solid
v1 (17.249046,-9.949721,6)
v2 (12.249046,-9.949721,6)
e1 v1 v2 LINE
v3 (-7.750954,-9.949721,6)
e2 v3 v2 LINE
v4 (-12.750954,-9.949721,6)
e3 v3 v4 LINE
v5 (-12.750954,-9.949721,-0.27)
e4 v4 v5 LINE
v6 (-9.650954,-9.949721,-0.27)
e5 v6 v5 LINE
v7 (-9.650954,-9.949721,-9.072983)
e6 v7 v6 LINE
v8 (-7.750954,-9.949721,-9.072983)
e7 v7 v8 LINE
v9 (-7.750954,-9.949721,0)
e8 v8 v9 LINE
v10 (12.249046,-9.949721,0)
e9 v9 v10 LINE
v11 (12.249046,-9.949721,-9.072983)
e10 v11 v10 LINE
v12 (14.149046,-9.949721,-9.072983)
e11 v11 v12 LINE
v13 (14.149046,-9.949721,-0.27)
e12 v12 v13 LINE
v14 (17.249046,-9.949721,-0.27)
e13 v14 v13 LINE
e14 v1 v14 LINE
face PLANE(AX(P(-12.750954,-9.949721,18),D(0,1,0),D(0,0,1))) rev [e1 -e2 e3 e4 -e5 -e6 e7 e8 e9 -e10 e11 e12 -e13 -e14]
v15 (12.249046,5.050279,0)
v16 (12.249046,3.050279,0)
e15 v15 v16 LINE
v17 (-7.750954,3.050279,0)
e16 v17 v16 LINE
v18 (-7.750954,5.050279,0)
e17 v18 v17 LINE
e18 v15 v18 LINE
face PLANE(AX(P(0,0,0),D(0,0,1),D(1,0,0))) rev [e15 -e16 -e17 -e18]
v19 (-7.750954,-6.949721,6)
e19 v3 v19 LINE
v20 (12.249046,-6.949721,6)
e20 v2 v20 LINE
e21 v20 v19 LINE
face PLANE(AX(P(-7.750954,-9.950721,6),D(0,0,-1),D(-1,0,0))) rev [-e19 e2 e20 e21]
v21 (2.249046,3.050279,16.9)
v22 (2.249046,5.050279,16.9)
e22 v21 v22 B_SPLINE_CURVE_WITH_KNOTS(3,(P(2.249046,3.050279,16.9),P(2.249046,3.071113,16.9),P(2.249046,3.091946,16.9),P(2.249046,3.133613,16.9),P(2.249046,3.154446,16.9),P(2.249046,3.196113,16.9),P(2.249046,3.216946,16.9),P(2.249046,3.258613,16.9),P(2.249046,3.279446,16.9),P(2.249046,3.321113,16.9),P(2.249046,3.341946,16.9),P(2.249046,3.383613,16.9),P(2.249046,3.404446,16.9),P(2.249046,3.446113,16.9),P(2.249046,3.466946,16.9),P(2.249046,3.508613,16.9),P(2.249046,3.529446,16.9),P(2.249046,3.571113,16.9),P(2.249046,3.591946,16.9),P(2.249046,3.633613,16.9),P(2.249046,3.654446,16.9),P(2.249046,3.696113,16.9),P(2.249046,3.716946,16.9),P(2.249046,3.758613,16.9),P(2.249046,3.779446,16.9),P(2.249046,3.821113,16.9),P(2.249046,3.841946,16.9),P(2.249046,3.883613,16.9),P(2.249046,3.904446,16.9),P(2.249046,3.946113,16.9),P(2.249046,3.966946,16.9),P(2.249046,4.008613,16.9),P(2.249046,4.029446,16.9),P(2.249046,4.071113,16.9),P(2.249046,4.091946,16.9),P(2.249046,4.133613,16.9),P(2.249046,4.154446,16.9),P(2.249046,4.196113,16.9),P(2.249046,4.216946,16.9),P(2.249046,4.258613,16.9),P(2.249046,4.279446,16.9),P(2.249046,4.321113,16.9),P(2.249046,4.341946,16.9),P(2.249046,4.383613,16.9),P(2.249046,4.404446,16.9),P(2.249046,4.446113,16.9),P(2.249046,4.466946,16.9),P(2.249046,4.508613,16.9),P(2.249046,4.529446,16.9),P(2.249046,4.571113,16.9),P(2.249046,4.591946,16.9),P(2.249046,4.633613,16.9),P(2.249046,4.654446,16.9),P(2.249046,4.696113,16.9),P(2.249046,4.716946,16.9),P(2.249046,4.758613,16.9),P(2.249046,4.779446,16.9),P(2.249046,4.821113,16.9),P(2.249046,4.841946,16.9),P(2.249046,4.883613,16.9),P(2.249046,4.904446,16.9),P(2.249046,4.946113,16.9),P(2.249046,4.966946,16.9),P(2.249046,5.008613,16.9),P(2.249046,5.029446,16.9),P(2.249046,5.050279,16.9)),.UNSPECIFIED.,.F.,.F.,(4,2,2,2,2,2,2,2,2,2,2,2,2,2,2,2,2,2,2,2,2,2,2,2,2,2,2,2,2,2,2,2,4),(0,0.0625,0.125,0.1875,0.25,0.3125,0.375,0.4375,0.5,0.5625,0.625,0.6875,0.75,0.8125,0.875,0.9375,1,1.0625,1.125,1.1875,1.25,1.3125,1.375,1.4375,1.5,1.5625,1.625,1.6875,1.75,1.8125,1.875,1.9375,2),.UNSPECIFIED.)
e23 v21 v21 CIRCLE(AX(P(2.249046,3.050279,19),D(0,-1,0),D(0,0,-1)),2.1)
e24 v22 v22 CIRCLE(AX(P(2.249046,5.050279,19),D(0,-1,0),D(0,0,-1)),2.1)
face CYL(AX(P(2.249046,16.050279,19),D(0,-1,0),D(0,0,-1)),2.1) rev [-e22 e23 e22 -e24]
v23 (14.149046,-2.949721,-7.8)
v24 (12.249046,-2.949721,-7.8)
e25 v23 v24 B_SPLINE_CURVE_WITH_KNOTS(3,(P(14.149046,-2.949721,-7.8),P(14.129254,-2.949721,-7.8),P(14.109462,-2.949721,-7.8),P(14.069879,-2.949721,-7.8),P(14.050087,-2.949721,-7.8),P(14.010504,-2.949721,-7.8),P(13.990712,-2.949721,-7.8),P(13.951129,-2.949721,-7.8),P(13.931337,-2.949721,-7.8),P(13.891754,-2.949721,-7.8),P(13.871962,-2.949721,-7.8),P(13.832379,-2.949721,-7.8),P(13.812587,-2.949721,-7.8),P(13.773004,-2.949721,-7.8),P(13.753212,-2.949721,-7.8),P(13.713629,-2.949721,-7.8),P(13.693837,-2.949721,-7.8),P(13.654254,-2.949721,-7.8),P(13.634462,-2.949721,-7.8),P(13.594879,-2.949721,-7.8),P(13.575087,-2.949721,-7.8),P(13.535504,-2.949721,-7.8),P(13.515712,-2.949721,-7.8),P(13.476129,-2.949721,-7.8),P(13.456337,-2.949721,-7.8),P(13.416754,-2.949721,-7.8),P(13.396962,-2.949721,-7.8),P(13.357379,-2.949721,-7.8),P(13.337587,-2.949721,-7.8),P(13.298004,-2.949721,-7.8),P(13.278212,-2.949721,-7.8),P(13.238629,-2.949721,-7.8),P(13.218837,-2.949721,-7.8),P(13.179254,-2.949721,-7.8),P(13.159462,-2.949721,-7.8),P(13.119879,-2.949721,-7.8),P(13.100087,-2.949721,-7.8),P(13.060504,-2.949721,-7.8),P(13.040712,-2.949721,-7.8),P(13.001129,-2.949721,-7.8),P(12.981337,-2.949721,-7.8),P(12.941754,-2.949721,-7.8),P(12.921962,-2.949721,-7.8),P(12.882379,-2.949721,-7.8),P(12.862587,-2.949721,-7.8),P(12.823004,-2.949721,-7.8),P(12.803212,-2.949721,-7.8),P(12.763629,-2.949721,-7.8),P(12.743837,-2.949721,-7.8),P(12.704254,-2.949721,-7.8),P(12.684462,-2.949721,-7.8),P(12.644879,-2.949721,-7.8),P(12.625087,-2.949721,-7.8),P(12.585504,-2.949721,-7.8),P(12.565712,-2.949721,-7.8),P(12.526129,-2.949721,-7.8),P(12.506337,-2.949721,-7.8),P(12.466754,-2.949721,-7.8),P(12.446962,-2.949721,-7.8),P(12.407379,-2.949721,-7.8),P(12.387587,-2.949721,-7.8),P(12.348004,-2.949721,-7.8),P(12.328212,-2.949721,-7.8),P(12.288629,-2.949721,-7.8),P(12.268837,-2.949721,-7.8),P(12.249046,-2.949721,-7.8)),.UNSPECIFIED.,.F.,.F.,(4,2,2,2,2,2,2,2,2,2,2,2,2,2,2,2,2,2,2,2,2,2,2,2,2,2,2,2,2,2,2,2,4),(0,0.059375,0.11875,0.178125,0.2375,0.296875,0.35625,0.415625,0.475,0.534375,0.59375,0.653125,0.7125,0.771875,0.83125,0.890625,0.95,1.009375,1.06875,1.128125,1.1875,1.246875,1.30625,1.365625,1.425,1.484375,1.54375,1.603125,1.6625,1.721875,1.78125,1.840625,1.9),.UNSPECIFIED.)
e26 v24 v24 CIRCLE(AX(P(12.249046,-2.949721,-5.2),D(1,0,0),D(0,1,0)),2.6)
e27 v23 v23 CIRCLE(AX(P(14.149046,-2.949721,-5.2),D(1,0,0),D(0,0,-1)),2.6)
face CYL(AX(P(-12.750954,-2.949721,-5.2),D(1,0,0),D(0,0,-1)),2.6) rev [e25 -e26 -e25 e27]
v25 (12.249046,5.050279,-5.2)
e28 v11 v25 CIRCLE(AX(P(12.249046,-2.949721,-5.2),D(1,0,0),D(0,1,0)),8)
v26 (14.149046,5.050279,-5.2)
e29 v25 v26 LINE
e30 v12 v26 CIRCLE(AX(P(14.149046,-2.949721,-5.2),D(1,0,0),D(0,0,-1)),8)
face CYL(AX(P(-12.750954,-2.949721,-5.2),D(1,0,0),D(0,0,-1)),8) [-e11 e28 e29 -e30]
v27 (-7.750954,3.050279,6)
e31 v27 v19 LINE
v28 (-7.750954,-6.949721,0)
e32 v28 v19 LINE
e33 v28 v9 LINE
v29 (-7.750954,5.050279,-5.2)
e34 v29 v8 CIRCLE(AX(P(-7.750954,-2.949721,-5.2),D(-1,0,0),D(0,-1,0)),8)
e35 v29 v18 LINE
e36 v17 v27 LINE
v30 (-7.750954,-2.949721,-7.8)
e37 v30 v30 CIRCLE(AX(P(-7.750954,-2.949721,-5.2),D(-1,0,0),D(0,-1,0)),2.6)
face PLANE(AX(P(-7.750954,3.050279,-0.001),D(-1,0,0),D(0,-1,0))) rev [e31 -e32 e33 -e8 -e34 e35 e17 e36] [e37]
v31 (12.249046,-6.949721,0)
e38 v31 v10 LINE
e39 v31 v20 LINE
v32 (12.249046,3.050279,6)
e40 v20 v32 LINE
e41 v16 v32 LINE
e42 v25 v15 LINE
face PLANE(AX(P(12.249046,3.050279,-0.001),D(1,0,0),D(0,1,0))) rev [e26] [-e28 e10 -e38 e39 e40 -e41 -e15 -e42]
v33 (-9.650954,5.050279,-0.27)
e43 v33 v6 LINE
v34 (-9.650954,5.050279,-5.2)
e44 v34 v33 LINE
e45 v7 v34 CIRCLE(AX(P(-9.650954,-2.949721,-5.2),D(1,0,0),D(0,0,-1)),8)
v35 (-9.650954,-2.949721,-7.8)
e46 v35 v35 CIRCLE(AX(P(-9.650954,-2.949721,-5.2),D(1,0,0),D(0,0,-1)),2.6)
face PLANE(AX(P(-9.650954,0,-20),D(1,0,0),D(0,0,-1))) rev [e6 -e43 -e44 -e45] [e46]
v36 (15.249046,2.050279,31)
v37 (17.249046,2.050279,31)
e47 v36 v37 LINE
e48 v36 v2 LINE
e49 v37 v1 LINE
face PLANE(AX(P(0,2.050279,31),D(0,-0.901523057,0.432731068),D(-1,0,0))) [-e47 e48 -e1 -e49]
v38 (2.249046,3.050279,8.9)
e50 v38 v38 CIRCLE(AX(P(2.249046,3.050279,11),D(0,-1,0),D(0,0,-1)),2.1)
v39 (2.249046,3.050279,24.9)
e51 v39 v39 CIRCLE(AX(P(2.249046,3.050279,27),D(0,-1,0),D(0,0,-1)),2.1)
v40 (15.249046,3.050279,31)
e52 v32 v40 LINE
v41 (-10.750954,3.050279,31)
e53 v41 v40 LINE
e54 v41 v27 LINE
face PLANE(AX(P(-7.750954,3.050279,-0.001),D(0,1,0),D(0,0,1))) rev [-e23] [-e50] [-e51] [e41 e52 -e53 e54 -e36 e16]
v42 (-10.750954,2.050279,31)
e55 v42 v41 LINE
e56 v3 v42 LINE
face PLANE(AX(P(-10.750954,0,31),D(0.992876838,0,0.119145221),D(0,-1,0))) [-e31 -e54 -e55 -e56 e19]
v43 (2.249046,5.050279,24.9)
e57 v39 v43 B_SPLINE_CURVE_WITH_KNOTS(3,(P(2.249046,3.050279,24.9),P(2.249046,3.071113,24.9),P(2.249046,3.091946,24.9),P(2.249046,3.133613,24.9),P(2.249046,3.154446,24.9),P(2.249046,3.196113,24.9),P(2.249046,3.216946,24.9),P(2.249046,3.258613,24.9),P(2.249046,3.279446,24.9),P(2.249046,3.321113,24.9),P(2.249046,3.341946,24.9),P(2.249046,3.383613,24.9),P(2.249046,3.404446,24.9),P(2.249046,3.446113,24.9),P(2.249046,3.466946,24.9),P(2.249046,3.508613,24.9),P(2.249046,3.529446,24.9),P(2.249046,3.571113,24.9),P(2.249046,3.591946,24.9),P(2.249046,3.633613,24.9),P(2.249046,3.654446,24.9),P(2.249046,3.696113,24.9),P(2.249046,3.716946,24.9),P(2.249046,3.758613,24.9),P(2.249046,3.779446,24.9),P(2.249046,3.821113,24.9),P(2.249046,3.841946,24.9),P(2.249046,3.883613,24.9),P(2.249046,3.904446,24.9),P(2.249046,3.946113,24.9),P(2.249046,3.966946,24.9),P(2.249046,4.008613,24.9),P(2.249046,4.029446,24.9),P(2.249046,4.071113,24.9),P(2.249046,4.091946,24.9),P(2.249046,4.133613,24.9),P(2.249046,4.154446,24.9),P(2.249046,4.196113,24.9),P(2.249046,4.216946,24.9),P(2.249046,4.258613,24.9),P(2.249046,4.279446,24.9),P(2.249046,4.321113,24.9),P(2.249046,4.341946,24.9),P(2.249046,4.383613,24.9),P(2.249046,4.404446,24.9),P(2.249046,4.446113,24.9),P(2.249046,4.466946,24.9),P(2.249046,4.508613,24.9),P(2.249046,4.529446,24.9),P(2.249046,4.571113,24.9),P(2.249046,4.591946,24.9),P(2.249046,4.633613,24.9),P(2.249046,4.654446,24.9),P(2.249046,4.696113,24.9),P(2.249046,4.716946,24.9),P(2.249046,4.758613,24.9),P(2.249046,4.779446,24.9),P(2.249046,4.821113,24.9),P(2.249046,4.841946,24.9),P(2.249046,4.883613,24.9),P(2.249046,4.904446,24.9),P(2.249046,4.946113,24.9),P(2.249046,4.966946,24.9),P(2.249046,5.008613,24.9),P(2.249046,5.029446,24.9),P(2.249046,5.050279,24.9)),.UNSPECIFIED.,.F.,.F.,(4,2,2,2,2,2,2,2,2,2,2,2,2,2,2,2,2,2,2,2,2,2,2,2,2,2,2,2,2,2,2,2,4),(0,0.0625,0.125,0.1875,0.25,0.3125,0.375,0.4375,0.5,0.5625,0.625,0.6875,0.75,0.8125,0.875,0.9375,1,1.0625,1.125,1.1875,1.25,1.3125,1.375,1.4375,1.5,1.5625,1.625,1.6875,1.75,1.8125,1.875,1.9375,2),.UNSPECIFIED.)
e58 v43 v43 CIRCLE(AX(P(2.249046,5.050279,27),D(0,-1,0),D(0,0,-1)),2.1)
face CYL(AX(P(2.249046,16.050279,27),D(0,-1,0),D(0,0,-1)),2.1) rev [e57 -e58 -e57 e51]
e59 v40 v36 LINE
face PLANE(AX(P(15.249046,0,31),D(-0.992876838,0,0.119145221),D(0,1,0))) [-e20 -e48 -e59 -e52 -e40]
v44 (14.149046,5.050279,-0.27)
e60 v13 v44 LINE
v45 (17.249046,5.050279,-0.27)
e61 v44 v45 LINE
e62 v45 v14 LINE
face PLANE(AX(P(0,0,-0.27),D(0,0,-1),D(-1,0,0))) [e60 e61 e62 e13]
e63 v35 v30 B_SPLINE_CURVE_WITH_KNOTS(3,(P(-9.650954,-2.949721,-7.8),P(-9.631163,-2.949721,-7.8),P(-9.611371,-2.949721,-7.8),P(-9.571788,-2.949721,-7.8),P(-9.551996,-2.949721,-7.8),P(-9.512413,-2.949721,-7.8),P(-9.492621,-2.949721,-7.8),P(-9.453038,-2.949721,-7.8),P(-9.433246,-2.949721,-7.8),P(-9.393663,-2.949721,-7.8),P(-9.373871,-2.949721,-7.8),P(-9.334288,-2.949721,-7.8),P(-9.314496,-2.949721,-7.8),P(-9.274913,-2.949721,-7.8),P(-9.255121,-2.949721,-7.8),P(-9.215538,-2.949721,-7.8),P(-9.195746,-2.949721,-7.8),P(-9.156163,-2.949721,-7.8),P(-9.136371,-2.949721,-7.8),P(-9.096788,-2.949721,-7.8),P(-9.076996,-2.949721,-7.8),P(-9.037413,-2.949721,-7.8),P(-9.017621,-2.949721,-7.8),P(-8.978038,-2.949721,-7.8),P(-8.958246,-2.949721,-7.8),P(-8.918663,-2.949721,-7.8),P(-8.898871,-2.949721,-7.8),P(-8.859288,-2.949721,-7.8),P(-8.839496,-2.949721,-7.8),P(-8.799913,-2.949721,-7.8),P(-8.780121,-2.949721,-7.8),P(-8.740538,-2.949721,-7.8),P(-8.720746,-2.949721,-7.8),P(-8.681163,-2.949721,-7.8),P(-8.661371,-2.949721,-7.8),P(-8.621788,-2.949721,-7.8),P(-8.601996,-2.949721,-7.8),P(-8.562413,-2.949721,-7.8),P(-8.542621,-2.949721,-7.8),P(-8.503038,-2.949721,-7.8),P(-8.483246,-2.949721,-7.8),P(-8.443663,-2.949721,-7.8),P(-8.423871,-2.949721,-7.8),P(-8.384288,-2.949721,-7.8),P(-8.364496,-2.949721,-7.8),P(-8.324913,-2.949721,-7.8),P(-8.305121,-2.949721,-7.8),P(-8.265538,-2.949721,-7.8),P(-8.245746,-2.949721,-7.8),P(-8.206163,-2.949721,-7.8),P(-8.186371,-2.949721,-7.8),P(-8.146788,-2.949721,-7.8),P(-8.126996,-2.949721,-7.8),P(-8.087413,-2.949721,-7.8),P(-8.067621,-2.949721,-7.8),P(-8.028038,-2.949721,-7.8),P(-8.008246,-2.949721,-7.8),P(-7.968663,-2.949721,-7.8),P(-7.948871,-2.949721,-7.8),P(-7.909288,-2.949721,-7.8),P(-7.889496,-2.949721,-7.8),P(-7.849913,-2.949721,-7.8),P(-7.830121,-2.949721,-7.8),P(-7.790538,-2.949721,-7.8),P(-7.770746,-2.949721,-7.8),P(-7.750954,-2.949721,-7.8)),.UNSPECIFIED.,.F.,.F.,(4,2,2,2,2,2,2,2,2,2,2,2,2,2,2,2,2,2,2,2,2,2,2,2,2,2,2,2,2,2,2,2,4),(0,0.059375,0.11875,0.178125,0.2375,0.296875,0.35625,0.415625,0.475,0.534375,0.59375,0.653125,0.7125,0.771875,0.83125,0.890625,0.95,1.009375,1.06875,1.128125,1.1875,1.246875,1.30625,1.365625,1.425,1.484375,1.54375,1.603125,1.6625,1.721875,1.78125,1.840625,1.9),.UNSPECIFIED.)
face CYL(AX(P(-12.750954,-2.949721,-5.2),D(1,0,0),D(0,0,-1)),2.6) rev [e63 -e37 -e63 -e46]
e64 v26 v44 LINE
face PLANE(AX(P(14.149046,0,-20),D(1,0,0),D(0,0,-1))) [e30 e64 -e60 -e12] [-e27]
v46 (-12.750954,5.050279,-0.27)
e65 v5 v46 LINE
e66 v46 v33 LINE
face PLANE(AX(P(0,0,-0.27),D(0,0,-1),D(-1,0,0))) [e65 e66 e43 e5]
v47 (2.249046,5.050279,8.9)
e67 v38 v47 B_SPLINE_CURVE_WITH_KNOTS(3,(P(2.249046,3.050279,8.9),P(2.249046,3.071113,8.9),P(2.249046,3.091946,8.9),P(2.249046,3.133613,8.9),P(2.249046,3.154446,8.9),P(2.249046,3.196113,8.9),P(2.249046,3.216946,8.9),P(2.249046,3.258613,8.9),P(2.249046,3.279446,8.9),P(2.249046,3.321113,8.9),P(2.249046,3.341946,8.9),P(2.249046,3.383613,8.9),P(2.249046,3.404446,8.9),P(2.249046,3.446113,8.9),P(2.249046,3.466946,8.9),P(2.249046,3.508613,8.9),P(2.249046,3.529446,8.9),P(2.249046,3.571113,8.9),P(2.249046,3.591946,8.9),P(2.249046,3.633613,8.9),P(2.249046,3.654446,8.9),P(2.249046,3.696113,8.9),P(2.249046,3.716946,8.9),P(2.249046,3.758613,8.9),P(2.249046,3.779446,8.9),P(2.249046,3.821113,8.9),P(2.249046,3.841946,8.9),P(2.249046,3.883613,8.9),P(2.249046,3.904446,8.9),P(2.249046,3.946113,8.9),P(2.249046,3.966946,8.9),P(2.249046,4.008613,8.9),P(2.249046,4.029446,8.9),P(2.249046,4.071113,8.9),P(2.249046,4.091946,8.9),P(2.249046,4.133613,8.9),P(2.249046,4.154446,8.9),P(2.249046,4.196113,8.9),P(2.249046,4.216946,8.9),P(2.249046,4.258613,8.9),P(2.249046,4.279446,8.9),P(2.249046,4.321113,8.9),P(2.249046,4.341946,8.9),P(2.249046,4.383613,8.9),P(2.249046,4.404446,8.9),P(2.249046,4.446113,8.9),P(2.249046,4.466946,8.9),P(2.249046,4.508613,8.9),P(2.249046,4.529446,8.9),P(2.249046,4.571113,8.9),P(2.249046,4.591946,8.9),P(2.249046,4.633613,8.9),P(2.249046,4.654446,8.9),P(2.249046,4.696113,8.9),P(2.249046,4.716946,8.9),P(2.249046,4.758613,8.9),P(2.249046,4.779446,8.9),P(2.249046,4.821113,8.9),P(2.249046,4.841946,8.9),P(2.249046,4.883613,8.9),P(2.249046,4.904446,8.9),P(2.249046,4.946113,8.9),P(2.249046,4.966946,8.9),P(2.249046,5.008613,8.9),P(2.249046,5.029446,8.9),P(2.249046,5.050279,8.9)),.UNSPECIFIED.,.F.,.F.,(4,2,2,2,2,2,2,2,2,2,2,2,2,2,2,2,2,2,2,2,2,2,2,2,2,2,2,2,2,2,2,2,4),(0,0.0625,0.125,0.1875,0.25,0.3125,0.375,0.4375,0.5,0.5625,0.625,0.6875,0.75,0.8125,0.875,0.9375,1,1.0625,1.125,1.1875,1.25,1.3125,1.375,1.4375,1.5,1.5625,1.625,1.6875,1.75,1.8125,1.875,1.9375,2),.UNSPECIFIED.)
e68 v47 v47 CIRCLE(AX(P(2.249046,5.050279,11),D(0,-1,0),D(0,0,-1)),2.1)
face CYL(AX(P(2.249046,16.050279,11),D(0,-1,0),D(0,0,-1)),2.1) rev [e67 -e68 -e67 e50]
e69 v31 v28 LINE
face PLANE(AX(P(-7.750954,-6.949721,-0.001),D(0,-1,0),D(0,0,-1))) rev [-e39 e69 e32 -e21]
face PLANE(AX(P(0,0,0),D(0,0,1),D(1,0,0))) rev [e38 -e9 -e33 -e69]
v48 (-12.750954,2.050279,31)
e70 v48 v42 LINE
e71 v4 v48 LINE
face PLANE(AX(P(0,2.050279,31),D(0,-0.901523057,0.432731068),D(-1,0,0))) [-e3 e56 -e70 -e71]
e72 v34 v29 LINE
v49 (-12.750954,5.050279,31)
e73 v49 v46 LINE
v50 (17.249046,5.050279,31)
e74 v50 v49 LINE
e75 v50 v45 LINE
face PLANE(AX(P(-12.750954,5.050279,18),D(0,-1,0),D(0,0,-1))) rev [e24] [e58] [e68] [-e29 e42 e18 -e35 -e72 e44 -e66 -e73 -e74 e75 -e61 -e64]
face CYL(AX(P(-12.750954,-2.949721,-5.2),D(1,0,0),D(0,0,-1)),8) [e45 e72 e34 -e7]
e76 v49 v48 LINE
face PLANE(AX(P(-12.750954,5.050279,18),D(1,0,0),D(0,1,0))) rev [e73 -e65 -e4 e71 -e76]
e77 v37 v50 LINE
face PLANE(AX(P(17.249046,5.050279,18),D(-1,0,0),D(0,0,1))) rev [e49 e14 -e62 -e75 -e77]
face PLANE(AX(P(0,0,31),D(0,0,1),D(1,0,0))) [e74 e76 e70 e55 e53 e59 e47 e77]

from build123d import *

# Parameters (mm, degrees)
SKETCH_1_W               = 30
SKETCH_1_H               = 15
EXTRUDE_1_DEPTH          = 18
CUT_EXTRUDE_1_REACH      = 28.843
SKETCH_2_W               = 20
SKETCH_2_H               = 10
CUT_EXTRUDE_2_REACH      = 29.668
SKETCH_3_W               = 20
SKETCH_3_H               = 12
EXTRUDE_4_DEPTH          = 20
SKETCH_10_R              = 2.6
CUT_EXTRUDE_8_DEPTH      = 35.965796737
CUT_EXTRUDE_9_DEPTH      = 35.965796737
CUT_EXTRUDE_9_DEPTH_BACK = 35.965796737
SKETCH_12_W              = 1.696031958
SKETCH_12_H              = 15
SKETCH_17_W              = 3.1
SKETCH_17_H              = 15
EXTRUDE_8_DEPTH          = 0.27
EXTRUDE_9_DEPTH          = 13
CHAMFER_1_SIZE           = 25
CHAMFER_1_SIZE2          = 12
SKETCH_19_R              = 2.1
CUT_EXTRUDE_10_DEPTH     = 13
CHAMFER_2_SIZE           = 25
CHAMFER_2_SIZE_2         = 3


with BuildPart() as part:
    # 草圖1 → 填料-伸長1 (new body)
    with BuildSketch(Plane.XY):
        with Locations((2.249045701, -2.44972067)):
            Rectangle(SKETCH_1_W, SKETCH_1_H)
    extrude(amount=EXTRUDE_1_DEPTH)

    # 草圖2 → 除料-伸長1 (cut, up to next)
    with BuildSketch(Plane.XY.offset(18), mode=Mode.PRIVATE) as cut_extrude_1_sk1:
        with Locations((2.249045701, -1.94972067)):
            Rectangle(SKETCH_2_W, SKETCH_2_H)
    cut_extrude_1_tool1 = extrude(cut_extrude_1_sk1.sketch, amount=-CUT_EXTRUDE_1_REACH, mode=Mode.PRIVATE) & part.part
    add(cut_extrude_1_tool1.solids().sort_by_distance((2.249046, -1.949721, 18))[0], mode=Mode.SUBTRACT)

    # 草圖3 → 除料-伸長2 (cut, up to next)
    with BuildSketch(Plane(origin=(0, -6.94972067, 0), x_dir=(1, 0, 0), z_dir=(0, 1, 0)), mode=Mode.PRIVATE) as cut_extrude_2_sk1:
        with Locations((2.249045701, -12)):
            Rectangle(SKETCH_3_W, SKETCH_3_H)
    cut_extrude_2_tool1 = extrude(cut_extrude_2_sk1.sketch, amount=-CUT_EXTRUDE_2_REACH, mode=Mode.PRIVATE) & part.part
    add(cut_extrude_2_tool1.solids().sort_by_distance((2.249046, -6.949721, 12))[0], mode=Mode.SUBTRACT)

    # 草圖9 → 填料-伸長4 (add)
    with BuildSketch(Plane(origin=(0, 0, 0), x_dir=(-1, 0, 0), z_dir=(0, 0, -1))):
        Polygon((9.650954299, 5.05027933), (7.750954299, 5.05027933), (7.750954299, 3.05027933), (7.750954299, -6.94972067), (7.750954299, -9.94972067), (9.650954299, -9.94972067), align=None)
        Polygon((-12.249045701, 3.05027933), (-12.249045701, 5.05027933), (-14.149045701, 5.05027933), (-14.149045701, -9.94972067), (-12.249045701, -9.94972067), (-12.249045701, -6.94972067), align=None)
    extrude(amount=EXTRUDE_4_DEPTH)

    # 草圖10 → 除料-伸長8 (cut, through all)
    with BuildSketch(Plane(origin=(14.149045701, 0, 0), x_dir=(0, 0, -1), z_dir=(1, 0, 0))):
        with Locations((5.2, -2.94972067)):
            Circle(SKETCH_10_R)
    extrude(amount=-CUT_EXTRUDE_8_DEPTH, mode=Mode.SUBTRACT)

    # 草圖12 → 除料-伸長9 (cut, two sides: drawn at the far end of the back side and taken through both)
    with BuildSketch(Plane(origin=(14.149045701, 0, 0), x_dir=(0, 0, -1), z_dir=(1, 0, 0)).offset(-CUT_EXTRUDE_9_DEPTH_BACK)):
        with BuildLine():
            Line((18.303968042, 5.05027933), (5.2, 5.05027933))
            ThreePointArc((5.2, 5.05027933), (10.856854249, 2.707133579), (13.2, -2.94972067))
            ThreePointArc((13.2, -2.94972067), (12.091439137, -7.012732683), (9.072983346, -9.94972067))
            Line((9.072983346, -9.94972067), (18.303968042, -9.94972067))
            Line((18.303968042, -9.94972067), (18.303968042, 5.05027933))
        make_face()
        with Locations((19.151984021, -2.44972067)):
            Rectangle(SKETCH_12_W, SKETCH_12_H)
    extrude(amount=CUT_EXTRUDE_9_DEPTH + CUT_EXTRUDE_9_DEPTH_BACK, mode=Mode.SUBTRACT)

    # 草圖17 → 填料-伸長8 (add)
    with BuildSketch(Plane(origin=(0, 0, 0), x_dir=(-1, 0, 0), z_dir=(0, 0, -1))):
        with Locations((-15.699045701, -2.44972067)):
            Rectangle(SKETCH_17_W, SKETCH_17_H)
        with Locations((11.200954299, -2.44972067)):
            Rectangle(SKETCH_17_W, SKETCH_17_H)
    extrude(amount=EXTRUDE_8_DEPTH)

    # 草圖18 → 填料-伸長9 (add)
    with BuildSketch(Plane.XY.offset(18)):
        Polygon((-12.750954299, 5.05027933), (-12.750954299, -9.94972067), (-7.750954299, -9.94972067), (-7.750954299, 3.05027933), (12.249045701, 3.05027933), (12.249045701, -9.94972067), (17.249045701, -9.94972067), (17.249045701, 5.05027933), align=None)
    extrude(amount=EXTRUDE_9_DEPTH)

    # 導角1
    chamfer_1_edges = [part.edges().sort_by_distance(p)[0] for p in [
        (14.749045701, -9.94972067, 31),
        (-10.250954299, -9.94972067, 31),
    ]]
    chamfer_1_side = [part.faces().sort_by_distance(p)[0] for p in [
        (13.648461643, -9.94972067, -4.671491673),
    ]]
    chamfer(chamfer_1_edges, length=CHAMFER_1_SIZE, length2=CHAMFER_1_SIZE2, reference=chamfer_1_side[0])

    # 草圖19 → 除料-伸長10 (cut)
    with BuildSketch(Plane(origin=(0, 3.05027933, 0), x_dir=(-1, 0, 0), z_dir=(0, -1, 0))):
        with Locations(Location((-2.249045701, -27, 0), (0, 0, 90))):
            Circle(SKETCH_19_R)
        with Locations(Location((-2.249045701, -19, 0), (0, 0, 90))):
            Circle(SKETCH_19_R)
        with Locations(Location((-2.249045701, -11, 0), (0, 0, 90))):
            Circle(SKETCH_19_R)
    extrude(amount=-CUT_EXTRUDE_10_DEPTH, mode=Mode.SUBTRACT)

    # 導角2
    # the kernel refuses this chamfer: 25, 3 mm, written as the material it takes off along each edge
    with BuildSketch(Plane(origin=(12.249045701, 3.05027933, 31), x_dir=(-0.004583716135178889, 0, -0.9999894947180156), z_dir=(0, -1, 0)), Plane(origin=(-7.750954299, -62.93259543, 31), x_dir=(0.004583716135178923, 0, -0.9999894947180156), z_dir=(0, 1, 0))) as chamfer_2_piece_1:
        Polygon((CHAMFER_2_SIZE * 0.999989494718, CHAMFER_2_SIZE * 0.00458371613518), (-CHAMFER_2_SIZE_2 * 0.00458371613518, CHAMFER_2_SIZE_2 * 0.999989494718), (0, 0), align=None)
    extrude(amount=65.98287476, mode=Mode.SUBTRACT)


solid = part.part
